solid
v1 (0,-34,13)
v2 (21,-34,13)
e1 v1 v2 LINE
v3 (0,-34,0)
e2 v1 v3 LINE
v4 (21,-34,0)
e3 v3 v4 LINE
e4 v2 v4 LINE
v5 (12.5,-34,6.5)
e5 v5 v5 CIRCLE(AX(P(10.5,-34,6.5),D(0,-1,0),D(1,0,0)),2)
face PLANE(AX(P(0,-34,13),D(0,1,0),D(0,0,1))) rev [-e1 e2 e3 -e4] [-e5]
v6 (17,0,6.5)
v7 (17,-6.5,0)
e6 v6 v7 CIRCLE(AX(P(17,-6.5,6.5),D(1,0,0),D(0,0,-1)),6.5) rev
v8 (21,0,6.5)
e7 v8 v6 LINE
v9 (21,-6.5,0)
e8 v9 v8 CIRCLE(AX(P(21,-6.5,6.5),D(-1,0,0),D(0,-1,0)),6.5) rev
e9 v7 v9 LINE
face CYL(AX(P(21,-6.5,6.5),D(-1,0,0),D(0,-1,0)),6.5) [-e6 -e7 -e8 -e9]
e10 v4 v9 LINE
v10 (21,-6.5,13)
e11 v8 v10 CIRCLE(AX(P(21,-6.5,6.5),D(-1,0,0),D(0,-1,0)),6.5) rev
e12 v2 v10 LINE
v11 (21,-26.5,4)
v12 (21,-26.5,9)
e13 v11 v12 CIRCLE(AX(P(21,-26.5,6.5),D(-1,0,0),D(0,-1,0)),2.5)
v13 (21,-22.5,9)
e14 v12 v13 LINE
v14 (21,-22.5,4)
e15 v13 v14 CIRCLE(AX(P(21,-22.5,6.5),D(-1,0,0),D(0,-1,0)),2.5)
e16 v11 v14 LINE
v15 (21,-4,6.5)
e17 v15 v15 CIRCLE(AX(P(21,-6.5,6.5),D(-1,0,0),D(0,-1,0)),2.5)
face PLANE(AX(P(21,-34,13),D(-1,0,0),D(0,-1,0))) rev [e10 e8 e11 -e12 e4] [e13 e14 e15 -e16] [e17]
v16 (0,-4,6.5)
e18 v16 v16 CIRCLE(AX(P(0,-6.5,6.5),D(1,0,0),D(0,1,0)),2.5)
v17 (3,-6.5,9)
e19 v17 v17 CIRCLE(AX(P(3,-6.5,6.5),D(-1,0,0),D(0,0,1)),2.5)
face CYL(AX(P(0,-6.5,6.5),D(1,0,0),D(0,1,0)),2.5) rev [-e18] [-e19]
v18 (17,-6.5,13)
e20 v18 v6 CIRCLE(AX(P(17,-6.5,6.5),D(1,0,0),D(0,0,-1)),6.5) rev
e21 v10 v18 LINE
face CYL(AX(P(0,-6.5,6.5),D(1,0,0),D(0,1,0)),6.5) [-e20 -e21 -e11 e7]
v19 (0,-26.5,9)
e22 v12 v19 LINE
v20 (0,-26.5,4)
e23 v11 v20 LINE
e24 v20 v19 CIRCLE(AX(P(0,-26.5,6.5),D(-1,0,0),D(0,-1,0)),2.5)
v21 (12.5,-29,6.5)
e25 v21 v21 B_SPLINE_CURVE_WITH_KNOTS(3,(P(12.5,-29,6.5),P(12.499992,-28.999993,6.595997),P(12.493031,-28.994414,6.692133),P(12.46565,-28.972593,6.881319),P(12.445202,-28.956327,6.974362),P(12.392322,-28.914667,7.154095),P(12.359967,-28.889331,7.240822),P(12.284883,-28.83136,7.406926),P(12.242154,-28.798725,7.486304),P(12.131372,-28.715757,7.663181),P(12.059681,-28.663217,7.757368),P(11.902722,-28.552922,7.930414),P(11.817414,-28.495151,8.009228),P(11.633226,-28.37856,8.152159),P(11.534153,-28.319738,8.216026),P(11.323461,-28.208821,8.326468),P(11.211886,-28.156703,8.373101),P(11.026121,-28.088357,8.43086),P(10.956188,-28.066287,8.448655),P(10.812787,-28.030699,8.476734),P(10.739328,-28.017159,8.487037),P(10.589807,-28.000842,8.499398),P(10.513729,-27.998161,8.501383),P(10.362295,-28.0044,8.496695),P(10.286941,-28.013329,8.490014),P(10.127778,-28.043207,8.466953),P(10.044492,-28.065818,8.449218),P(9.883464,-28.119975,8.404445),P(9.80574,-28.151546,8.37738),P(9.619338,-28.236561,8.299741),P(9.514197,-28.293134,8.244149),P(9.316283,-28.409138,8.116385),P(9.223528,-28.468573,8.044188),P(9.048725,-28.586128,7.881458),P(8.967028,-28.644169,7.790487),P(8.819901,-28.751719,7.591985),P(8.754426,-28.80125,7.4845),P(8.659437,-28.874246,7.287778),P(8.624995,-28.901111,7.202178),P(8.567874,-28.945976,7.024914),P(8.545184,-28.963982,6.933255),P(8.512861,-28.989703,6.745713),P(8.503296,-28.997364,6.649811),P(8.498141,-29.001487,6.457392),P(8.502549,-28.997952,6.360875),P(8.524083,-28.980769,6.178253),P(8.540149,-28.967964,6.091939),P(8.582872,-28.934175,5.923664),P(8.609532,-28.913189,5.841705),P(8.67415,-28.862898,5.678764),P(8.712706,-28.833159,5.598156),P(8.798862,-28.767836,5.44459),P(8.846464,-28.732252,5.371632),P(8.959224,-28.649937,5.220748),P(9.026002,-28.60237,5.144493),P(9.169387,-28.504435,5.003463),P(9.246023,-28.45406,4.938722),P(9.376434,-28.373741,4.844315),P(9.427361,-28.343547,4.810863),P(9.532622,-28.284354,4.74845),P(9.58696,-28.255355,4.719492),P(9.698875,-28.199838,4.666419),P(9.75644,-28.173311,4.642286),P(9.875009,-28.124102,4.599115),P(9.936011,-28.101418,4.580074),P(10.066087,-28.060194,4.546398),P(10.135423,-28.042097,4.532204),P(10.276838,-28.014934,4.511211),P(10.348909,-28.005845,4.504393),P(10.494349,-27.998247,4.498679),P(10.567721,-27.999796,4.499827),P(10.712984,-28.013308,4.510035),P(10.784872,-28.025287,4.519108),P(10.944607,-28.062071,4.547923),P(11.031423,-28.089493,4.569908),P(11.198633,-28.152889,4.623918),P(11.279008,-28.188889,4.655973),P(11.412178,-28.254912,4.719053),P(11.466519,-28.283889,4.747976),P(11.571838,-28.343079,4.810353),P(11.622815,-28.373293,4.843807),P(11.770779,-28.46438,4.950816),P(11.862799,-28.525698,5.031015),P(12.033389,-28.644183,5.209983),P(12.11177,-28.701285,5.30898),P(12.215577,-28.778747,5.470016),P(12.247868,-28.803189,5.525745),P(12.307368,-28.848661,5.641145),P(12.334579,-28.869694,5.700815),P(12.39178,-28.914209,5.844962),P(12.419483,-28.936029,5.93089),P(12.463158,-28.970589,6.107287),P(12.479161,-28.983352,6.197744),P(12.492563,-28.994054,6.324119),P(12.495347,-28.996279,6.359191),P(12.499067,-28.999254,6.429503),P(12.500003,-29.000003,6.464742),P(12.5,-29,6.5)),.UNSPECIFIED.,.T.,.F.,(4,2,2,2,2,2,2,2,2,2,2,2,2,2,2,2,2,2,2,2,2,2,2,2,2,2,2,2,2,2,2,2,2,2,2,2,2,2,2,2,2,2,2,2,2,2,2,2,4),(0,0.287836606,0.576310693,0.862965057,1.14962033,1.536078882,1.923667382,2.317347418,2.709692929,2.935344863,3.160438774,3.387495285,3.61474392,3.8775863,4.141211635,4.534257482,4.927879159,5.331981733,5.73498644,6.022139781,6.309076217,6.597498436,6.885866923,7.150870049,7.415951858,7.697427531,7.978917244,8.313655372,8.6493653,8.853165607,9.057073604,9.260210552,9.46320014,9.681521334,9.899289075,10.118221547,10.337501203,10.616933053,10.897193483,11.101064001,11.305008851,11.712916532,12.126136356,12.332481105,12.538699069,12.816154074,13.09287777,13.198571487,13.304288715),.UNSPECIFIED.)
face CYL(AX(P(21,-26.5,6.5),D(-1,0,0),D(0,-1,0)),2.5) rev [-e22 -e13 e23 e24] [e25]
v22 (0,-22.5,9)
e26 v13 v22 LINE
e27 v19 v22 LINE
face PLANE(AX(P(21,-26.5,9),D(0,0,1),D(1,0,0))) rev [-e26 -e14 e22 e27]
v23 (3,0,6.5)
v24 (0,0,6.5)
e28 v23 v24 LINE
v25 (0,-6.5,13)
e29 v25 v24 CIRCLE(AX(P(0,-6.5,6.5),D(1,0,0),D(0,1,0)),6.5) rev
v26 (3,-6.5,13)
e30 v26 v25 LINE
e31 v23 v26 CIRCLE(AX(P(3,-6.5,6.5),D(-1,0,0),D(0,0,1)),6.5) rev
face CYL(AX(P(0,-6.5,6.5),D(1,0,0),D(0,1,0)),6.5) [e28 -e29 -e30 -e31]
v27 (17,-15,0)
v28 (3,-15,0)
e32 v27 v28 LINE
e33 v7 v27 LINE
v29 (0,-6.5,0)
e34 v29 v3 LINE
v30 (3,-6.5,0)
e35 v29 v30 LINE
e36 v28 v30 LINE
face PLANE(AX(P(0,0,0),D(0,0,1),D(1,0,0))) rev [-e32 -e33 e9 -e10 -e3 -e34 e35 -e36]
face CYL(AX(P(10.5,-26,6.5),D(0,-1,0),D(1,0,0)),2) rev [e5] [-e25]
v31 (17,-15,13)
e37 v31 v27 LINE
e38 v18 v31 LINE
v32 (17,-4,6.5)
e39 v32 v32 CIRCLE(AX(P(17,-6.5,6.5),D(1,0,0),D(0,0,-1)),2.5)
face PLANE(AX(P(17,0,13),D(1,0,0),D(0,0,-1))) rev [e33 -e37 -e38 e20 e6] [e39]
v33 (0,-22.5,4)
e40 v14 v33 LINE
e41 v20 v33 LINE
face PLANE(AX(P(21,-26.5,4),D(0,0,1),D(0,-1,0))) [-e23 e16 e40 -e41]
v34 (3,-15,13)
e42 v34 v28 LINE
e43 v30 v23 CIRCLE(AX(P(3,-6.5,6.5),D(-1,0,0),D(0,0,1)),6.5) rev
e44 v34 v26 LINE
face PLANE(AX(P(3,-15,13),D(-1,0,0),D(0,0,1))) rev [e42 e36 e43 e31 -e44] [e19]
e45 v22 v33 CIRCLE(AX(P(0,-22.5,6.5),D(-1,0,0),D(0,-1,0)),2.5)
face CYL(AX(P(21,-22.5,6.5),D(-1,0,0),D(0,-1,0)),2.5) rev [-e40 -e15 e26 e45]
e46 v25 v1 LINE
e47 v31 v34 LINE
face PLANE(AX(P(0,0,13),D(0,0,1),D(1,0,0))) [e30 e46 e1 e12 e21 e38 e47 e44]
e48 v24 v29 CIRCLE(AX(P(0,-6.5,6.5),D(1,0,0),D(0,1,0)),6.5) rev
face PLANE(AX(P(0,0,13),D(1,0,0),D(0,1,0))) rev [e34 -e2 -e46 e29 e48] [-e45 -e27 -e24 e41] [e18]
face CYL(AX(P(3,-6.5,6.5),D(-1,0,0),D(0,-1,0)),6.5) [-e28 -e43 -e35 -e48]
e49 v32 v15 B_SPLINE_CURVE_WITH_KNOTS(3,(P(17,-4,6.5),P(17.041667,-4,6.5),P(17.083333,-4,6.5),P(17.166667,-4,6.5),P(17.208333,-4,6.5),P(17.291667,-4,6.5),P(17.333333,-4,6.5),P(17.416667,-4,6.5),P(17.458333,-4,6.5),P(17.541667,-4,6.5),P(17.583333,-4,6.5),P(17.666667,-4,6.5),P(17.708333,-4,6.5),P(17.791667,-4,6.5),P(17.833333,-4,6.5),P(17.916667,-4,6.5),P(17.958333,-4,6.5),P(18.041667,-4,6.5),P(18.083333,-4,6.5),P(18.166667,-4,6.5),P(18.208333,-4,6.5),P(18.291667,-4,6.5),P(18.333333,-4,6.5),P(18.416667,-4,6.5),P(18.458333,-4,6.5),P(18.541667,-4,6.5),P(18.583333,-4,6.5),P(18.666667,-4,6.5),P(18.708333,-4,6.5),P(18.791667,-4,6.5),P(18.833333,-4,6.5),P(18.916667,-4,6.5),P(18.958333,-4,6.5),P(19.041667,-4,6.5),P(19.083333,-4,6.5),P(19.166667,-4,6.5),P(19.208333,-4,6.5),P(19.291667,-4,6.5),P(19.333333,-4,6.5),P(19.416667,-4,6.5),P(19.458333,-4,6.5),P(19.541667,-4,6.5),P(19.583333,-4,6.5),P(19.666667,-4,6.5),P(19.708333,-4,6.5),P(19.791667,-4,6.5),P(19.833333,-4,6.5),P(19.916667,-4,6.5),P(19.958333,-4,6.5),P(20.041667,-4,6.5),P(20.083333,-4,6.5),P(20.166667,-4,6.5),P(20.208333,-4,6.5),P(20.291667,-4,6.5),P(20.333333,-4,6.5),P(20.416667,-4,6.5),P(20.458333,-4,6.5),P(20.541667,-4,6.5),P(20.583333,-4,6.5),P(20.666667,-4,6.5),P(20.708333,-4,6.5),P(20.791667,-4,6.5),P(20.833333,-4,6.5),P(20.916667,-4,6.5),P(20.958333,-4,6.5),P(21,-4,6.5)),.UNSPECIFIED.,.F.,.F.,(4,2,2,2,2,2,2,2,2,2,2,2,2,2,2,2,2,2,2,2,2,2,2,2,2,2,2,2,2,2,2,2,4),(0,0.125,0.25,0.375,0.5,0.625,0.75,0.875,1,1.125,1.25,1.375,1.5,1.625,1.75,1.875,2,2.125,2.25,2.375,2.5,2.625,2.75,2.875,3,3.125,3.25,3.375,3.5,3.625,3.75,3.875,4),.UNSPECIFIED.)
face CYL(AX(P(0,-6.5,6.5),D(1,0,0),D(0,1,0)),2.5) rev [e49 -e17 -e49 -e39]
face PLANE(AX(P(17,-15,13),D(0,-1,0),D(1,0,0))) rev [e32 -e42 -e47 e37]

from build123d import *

# Parameters (mm, degrees)
BOSS_EXTRUDE1_DEPTH     = 13
CUT_EXTRUDE1_DEPTH      = 43.023802779
CUT_EXTRUDE2_DEPTH      = 43.023802779
CUT_EXTRUDE2_DEPTH_BACK = 43.023802779
SKETCH5_R               = 2.5
FILLET1_R               = 6.5
SKETCH6_R               = 2
CUT_EXTRUDE3_DEPTH      = 8


with BuildPart() as part:
    # Sketch2 → Boss-Extrude1 (new body)
    with BuildSketch(Plane.XY):
        Polygon((0, 0), (0, -34), (21, -34), (21, 0), (17, 0), (17, -15), (3, -15), (3, 0), align=None)
    extrude(amount=BOSS_EXTRUDE1_DEPTH)

    # Sketch4 → Cut-Extrude1 (cut, through all)
    with BuildSketch(Plane.ZY):
        with BuildLine():
            Line((4, -26.5), (4, -22.5))
            ThreePointArc((4, -22.5), (6.5, -20), (9, -22.5))
            Line((9, -22.5), (9, -26.5))
            ThreePointArc((9, -26.5), (6.5, -29), (4, -26.5))
        make_face()
    extrude(amount=-CUT_EXTRUDE1_DEPTH, mode=Mode.SUBTRACT)

    # Sketch5 → Cut-Extrude2 (cut, two sides: drawn at the far end of the back side and taken through both)
    with BuildSketch(Plane(origin=(21, 0, 0), x_dir=(0, 0, -1), z_dir=(1, 0, 0)).offset(-CUT_EXTRUDE2_DEPTH_BACK)):
        with Locations(Location((-6.5, -6.5, 0), (0, 0, 90))):
            Circle(SKETCH5_R)
    extrude(amount=CUT_EXTRUDE2_DEPTH + CUT_EXTRUDE2_DEPTH_BACK, mode=Mode.SUBTRACT)

    # Fillet1
    fillet1_edges = [part.edges().sort_by_distance(p)[0] for p in [
        (19, 0, 13),
        (1.5, 0, 13),
        (1.5, 0, 0),
        (19, 0, 0),
    ]]
    fillet(fillet1_edges, radius=FILLET1_R - 0.0001)  # a hair under: the kernel refuses the full size

    # Sketch6 → Cut-Extrude3 (cut)
    with BuildSketch(Plane.XZ.offset(34)):
        with Locations((10.5, 6.5)):
            Circle(SKETCH6_R)
    extrude(amount=-CUT_EXTRUDE3_DEPTH, mode=Mode.SUBTRACT)


solid = part.part
